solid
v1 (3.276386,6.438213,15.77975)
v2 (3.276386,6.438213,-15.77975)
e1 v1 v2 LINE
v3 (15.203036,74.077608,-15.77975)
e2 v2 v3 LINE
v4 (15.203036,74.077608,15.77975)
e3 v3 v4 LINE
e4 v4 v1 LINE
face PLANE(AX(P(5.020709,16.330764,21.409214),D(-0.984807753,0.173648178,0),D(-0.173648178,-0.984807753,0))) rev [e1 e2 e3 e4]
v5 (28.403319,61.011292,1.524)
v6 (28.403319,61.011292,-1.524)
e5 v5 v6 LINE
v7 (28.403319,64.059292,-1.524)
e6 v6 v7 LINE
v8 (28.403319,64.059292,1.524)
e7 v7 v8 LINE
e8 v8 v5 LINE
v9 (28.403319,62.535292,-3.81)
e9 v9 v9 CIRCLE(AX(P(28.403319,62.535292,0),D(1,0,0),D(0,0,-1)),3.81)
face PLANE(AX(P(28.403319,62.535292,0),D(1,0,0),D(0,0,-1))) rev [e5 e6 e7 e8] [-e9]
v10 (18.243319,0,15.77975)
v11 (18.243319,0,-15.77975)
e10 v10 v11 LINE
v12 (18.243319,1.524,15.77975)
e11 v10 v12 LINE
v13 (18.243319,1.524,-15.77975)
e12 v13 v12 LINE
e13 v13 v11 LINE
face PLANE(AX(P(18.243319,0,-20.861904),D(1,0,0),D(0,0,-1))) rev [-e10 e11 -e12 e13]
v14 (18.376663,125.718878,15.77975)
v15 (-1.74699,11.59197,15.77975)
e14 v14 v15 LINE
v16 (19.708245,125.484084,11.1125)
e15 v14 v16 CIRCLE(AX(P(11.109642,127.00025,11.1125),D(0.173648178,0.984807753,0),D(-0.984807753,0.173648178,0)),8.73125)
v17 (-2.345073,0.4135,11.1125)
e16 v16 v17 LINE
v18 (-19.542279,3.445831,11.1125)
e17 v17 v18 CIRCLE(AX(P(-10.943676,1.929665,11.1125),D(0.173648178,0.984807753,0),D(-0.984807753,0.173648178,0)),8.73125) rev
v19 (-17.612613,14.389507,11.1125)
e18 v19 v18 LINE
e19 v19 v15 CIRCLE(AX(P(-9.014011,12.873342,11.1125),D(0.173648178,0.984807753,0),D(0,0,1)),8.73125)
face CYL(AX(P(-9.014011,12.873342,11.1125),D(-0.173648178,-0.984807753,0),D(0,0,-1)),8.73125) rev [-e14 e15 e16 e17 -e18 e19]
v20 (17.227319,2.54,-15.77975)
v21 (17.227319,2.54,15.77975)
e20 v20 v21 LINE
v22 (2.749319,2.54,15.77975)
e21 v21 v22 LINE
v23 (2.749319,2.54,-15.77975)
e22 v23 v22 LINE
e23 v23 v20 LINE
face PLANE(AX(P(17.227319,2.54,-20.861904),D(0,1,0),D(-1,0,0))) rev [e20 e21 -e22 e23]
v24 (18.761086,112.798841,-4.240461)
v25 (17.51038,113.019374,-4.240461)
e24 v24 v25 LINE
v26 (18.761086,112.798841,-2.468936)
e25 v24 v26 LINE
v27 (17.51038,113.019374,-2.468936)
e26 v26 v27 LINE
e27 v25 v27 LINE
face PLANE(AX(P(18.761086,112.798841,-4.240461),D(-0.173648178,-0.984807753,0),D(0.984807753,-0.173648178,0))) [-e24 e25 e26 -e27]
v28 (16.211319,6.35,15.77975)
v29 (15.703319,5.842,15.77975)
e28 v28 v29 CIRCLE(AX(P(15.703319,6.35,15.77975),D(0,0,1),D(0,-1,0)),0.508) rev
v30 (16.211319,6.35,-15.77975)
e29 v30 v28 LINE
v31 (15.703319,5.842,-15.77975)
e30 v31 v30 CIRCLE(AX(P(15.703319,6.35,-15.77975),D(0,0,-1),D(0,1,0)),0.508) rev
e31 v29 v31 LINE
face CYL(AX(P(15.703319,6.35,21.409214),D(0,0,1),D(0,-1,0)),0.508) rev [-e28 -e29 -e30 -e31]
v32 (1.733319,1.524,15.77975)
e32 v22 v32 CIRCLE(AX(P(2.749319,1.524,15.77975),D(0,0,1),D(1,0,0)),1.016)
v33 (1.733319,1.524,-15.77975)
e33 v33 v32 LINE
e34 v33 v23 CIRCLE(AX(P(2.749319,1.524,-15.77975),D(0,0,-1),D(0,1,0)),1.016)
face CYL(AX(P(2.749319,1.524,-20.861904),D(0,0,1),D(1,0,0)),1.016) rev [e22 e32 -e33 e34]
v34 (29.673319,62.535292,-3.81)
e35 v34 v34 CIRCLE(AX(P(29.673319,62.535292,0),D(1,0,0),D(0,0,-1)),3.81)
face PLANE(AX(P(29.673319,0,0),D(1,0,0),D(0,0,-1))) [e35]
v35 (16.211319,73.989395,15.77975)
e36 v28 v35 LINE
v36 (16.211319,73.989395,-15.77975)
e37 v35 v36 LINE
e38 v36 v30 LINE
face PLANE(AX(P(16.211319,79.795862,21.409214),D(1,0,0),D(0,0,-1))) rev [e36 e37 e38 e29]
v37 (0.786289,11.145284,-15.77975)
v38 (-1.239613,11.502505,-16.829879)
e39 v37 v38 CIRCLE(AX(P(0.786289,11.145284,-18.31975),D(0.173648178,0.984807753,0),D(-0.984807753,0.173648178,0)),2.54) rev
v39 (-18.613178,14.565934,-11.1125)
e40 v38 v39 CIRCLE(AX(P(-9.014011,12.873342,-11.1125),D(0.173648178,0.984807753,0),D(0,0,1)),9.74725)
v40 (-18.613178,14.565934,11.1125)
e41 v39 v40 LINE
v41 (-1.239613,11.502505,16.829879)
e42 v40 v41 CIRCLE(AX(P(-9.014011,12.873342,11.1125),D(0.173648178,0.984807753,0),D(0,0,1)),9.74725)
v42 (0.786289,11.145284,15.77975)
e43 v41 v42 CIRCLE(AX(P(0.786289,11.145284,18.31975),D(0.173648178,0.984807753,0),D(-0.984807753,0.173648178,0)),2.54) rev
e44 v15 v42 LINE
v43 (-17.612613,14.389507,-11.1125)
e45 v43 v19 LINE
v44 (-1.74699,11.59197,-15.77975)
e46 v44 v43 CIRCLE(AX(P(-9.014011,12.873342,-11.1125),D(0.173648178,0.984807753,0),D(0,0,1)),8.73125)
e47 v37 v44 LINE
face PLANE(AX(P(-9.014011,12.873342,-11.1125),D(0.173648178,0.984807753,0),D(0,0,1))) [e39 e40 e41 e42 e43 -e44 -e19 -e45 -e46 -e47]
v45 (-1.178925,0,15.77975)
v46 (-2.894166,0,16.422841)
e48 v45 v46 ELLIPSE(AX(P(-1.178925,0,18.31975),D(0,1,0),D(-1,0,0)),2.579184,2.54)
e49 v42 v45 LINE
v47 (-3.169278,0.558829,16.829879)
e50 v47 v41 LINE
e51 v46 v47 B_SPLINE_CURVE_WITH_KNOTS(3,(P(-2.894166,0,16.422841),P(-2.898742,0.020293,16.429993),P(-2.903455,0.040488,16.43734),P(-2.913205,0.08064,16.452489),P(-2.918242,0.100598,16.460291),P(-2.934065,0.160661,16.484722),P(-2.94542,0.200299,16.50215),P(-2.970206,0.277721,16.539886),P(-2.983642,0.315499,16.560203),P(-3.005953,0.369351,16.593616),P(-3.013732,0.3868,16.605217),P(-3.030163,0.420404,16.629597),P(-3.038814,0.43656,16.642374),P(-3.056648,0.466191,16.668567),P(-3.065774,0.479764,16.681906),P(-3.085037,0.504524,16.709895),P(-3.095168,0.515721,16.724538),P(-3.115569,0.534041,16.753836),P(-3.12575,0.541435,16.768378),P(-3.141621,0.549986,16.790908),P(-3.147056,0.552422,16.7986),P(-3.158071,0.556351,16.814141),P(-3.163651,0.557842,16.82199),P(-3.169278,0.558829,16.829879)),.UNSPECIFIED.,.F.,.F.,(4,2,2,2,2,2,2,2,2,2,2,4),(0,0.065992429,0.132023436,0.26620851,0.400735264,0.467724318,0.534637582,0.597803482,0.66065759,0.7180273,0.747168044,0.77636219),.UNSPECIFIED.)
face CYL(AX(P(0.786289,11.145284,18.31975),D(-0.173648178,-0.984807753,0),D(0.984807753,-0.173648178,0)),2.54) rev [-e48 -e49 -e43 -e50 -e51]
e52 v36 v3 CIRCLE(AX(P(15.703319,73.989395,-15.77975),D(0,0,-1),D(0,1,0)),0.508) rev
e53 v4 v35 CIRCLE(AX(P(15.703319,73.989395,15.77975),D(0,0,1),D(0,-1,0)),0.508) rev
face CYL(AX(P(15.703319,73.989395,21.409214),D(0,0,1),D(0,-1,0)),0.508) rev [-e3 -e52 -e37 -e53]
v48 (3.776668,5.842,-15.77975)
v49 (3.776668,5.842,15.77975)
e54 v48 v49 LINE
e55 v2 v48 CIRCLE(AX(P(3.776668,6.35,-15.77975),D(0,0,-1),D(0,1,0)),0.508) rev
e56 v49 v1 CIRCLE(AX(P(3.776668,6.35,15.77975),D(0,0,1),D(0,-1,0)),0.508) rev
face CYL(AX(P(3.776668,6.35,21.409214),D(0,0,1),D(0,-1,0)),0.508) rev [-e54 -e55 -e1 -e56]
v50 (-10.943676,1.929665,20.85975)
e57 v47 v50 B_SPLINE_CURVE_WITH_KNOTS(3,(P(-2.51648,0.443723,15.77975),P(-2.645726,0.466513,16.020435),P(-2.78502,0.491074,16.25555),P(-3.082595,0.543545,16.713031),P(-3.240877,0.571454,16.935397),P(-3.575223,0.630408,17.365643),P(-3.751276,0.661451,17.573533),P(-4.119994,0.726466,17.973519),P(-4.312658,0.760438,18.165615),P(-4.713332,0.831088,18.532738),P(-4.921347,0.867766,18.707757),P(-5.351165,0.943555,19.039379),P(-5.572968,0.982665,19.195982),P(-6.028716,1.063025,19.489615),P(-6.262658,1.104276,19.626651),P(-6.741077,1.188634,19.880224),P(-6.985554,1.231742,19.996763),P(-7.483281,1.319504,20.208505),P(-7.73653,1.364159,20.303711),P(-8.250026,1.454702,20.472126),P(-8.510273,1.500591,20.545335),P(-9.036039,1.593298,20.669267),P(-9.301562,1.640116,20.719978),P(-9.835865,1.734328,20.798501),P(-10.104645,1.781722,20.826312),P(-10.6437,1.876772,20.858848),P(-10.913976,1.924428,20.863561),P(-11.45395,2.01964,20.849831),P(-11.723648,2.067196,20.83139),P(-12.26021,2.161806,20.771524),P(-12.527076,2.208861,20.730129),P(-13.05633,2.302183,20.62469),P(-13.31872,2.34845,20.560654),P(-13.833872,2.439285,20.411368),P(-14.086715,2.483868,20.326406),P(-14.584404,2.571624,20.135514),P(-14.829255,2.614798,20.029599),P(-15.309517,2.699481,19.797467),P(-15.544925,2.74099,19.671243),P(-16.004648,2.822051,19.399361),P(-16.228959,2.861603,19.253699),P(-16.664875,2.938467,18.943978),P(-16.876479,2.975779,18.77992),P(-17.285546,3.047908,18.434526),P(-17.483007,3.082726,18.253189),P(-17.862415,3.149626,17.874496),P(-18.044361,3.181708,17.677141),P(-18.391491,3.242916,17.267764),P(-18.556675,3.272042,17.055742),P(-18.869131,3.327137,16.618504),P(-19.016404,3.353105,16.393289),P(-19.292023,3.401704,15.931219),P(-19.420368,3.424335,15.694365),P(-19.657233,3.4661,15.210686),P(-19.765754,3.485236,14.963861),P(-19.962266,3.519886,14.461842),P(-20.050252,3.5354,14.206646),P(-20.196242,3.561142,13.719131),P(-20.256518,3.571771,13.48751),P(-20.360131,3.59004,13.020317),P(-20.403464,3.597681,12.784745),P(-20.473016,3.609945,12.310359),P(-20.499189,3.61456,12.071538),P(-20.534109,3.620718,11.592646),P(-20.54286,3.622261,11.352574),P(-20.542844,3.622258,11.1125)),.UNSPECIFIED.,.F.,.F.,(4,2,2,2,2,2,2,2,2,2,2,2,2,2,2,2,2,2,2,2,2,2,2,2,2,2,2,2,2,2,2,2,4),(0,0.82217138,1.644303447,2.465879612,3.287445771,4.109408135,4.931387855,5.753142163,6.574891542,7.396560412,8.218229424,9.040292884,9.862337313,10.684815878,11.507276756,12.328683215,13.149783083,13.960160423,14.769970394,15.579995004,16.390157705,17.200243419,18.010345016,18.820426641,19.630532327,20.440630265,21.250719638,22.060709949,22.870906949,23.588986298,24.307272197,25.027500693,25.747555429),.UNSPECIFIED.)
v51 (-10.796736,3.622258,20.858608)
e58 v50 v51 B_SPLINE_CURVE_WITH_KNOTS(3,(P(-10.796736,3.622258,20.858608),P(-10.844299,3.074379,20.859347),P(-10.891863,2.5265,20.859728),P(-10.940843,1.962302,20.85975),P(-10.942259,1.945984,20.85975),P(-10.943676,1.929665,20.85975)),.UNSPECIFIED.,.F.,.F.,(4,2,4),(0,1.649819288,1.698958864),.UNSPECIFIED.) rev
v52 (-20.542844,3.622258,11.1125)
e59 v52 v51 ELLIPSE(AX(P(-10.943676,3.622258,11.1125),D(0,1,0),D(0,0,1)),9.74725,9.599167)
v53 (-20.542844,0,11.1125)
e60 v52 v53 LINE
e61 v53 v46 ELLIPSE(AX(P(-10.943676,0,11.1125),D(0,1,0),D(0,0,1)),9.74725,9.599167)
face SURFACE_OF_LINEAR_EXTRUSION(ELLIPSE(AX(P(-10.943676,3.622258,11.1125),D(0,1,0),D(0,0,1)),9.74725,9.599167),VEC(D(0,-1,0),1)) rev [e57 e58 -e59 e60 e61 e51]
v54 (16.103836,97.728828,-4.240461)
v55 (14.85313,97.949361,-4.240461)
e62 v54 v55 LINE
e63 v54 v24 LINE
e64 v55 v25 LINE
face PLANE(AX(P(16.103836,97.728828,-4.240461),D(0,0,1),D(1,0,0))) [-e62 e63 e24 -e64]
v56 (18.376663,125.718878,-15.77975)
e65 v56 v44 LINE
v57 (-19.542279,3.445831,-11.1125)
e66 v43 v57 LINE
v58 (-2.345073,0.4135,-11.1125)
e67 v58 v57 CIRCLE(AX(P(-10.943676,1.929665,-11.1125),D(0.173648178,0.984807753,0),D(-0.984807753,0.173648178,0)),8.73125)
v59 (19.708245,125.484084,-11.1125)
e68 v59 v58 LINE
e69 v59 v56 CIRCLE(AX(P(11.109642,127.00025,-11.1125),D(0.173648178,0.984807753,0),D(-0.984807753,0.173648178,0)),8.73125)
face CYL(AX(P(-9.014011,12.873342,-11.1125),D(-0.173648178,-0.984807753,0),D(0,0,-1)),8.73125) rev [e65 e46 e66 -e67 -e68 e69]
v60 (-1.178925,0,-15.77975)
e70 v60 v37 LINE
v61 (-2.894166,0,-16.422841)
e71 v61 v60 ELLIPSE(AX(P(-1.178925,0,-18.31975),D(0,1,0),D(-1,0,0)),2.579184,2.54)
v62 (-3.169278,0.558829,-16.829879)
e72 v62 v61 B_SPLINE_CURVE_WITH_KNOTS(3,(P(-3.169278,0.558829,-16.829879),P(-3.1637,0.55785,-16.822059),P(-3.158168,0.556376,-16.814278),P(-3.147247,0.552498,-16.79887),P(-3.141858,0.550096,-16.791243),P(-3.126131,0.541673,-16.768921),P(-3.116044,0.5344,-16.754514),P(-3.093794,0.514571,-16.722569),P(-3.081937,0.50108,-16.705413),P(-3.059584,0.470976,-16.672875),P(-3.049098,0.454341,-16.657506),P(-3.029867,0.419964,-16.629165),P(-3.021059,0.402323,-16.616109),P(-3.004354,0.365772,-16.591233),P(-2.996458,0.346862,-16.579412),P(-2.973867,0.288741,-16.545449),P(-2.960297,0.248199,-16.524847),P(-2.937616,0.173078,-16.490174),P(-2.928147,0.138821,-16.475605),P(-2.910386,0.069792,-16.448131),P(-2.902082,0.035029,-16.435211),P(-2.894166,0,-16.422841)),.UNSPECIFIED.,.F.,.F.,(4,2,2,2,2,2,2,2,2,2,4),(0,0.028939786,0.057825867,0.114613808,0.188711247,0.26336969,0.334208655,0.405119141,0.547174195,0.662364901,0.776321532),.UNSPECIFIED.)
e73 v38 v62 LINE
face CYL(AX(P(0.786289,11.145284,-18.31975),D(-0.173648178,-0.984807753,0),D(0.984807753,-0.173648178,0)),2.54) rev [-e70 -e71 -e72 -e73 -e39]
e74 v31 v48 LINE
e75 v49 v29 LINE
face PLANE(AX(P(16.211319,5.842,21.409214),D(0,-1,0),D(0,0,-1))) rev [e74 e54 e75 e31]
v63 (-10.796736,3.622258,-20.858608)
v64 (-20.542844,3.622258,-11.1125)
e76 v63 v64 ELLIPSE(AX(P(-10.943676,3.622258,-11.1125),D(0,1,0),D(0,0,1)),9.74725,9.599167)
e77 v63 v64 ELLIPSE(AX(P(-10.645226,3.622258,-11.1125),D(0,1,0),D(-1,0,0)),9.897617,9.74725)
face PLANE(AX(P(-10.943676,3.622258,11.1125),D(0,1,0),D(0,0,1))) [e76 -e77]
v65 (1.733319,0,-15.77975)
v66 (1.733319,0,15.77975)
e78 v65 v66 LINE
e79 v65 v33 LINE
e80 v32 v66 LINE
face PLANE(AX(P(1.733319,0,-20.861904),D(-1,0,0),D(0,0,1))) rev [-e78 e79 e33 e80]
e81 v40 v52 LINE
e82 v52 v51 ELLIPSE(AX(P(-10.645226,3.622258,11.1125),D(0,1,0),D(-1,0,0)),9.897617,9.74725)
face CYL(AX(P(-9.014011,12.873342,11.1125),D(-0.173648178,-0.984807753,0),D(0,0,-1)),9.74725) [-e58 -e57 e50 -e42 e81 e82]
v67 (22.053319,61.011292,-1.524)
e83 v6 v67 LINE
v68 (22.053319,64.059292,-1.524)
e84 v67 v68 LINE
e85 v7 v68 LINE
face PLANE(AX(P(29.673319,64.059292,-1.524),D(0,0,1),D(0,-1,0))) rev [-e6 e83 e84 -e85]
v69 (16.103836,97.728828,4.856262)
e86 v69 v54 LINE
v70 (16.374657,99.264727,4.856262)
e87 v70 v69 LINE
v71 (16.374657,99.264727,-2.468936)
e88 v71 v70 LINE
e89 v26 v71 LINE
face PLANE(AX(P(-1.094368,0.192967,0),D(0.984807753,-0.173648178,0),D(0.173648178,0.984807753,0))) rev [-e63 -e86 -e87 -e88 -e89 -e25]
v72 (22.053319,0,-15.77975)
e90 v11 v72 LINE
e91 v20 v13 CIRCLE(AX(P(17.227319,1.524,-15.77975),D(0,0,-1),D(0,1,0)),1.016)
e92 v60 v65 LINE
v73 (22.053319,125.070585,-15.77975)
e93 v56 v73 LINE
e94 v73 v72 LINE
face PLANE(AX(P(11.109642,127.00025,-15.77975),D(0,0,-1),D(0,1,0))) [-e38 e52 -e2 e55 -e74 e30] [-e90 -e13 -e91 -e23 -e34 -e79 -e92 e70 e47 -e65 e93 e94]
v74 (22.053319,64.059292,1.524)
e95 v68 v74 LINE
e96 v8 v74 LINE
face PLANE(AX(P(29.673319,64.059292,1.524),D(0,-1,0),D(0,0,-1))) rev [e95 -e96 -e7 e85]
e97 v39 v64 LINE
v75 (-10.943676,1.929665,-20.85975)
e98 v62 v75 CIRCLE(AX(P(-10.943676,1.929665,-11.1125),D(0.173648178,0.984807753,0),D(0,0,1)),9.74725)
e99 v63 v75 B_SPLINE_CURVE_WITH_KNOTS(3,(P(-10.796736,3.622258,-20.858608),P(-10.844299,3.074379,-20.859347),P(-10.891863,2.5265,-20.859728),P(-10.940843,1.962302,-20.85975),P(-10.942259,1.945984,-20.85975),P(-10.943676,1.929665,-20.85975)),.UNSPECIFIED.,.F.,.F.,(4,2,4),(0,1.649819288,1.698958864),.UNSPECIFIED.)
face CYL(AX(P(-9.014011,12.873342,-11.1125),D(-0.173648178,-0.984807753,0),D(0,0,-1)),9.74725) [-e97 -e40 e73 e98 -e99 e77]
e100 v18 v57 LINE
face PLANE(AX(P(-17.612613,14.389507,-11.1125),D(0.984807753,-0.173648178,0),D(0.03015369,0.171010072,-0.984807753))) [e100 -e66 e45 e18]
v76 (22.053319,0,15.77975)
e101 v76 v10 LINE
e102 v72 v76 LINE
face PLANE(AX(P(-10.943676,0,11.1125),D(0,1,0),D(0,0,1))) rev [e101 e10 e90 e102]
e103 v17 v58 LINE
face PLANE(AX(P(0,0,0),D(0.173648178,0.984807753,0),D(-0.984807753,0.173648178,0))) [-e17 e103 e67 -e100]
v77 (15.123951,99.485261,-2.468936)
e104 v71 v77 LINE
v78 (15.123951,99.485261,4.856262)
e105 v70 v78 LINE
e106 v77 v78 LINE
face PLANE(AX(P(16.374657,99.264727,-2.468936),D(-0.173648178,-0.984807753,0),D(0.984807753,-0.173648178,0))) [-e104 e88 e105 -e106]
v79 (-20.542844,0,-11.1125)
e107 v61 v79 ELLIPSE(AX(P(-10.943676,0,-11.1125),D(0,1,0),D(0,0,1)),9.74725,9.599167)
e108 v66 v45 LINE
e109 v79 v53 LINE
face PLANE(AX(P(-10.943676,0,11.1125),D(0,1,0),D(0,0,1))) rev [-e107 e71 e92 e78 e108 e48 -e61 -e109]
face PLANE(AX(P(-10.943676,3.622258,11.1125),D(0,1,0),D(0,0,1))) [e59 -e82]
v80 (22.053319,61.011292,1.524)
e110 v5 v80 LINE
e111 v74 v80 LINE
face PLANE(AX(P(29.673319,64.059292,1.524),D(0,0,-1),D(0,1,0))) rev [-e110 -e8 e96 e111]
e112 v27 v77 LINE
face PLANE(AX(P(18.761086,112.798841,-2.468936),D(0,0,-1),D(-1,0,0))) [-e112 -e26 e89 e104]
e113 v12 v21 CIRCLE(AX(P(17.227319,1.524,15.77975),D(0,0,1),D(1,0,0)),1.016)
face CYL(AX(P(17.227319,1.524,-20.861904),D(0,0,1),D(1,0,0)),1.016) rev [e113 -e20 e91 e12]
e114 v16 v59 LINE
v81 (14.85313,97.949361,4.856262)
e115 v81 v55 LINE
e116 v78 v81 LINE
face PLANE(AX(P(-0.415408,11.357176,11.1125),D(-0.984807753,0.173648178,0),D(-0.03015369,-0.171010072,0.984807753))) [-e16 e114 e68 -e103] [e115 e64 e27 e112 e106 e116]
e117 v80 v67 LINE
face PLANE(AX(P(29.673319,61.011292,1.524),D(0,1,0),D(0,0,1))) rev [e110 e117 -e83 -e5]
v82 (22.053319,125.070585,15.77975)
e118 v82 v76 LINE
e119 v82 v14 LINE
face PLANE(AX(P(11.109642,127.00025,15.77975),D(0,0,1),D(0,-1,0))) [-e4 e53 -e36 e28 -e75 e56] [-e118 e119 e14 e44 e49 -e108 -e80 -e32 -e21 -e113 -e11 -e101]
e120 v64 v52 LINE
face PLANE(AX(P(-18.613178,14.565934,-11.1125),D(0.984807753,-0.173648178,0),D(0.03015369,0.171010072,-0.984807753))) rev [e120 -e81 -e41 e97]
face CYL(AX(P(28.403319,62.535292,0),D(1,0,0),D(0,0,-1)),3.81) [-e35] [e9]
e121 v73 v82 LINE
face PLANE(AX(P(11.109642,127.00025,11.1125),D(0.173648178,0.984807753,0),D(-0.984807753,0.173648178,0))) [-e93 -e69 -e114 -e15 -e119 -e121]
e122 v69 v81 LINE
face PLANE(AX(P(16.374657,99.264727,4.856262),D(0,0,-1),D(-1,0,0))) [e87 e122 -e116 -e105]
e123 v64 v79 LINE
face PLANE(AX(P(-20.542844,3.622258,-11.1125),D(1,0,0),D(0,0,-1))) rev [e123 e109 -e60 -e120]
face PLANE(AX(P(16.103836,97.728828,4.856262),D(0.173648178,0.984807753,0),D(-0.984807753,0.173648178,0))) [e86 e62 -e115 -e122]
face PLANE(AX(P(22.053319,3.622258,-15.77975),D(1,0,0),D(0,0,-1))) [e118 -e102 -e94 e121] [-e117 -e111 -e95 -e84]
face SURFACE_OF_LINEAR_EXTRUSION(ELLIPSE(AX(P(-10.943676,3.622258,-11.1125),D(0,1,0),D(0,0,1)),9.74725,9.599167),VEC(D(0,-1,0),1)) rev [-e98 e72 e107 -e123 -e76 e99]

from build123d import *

# Parameters (mm, degrees)
BOSS_EXTRUDE1_DEPTH   = 3.175
BOSS_EXTRUDE2_START   = -3.175
BOSS_EXTRUDE2_DEPTH   = 11.112499999999999
BODY_MOVE_COPY2_ANGLE = 90.0000000000002
BOSS_EXTRUDE5_START   = -3.175
BOSS_EXTRUDE5_DEPTH   = 127
BOSS_EXTRUDE7_DEPTH   = 3.622257574
CUT_EXTRUDE1_START    = -11.112499999999999
CUT_EXTRUDE1_DEPTH    = 11.112499999999999
CUT_EXTRUDE4_REACH    = 131.332
LOFT1_START           = -15.77975
LOFT1_DEPTH           = 31.5595
CUT_EXTRUDE5_DEPTH    = 1.27
CUT_EXTRUDE6_DEPTH    = 133.79321580314624
FILLET2_R             = 0.508
CUT_EXTRUDE7_DEPTH    = 133.79321580314624
FILLET3_R             = 2.54
BOSS_EXTRUDE9_DEPTH   = 7.619999999999999
SKETCH20_R            = 3.81
BOSS_EXTRUDE10_DEPTH  = 1.27


with BuildPart() as part:
    # Sketch4 → Boss-Extrude1 (new body)
    with BuildSketch(Plane(origin=(0, 0, 0), x_dir=(0.984807753012208, -0.17364817766693072, 0), z_dir=(0.17364817766693072, 0.984807753012208, 0))):
        with BuildLine():
            Line((0, -8.731249999999998), (-22.225, -8.731249999999998))
            ThreePointArc((-22.225, -8.731249999999998), (-30.956249999999997, -1.63e-15), (-22.225000000000005, 8.73124999999999))
            Line((-22.225000000000005, 8.73124999999999), (1.71e-15, 8.73125))
            ThreePointArc((1.71e-15, 8.73125), (8.731249999999998, 0), (0, -8.731249999999998))
        make_face()
    extrude(amount=BOSS_EXTRUDE1_DEPTH)

    # Sketch5 → Boss-Extrude2 (add)
    with BuildSketch(Plane(origin=(0.5513329640925053, 3.1267646158137623, 0), x_dir=(0.9848077530122081, -0.17364817766693072, 0), z_dir=(0.17364817766693072, 0.9848077530122081, 0)).offset(BOSS_EXTRUDE2_START)):
        with BuildLine():
            Line((1.57e-15, 9.74725), (-22.225000000000005, 9.74724999999999))
            ThreePointArc((-22.225000000000005, 9.74724999999999), (-31.97225, -1.51e-15), (-22.225, -9.747249999999998))
            Line((-22.225, -9.747249999999998), (1.79e-15, -9.74725))
            ThreePointArc((1.79e-15, -9.74725), (9.74725, 2.16e-15), (1.57e-15, 9.74725))
        make_face()
        with BuildLine():
            Line((5.3e-16, 8.73125), (-22.225000000000005, 8.73124999999999))
            ThreePointArc((-22.225000000000005, 8.73124999999999), (-30.956249999999997, -1.63e-15), (-22.225000000000005, -8.731249999999998))
            Line((-22.225000000000005, -8.731249999999998), (-1.6e-15, -8.73125))
            ThreePointArc((-1.6e-15, -8.73125), (8.73125, -1.94e-15), (5.3e-16, 8.73125))
        make_face(mode=Mode.SUBTRACT)
    extrude(amount=BOSS_EXTRUDE2_DEPTH)


with BuildPart() as part_1:
    # Body-Move/Copy2: moved
    add(part.part.moved(Location((5e-17, 2.8e-16, 0))).rotate(Axis((-10.943676155348163, 1.9296653743237675, 1.73e-15), (0.1736481776669307, 0.984807753012208, 0)), BODY_MOVE_COPY2_ANGLE))

    # Sketch6 → Boss-Extrude5 (add)
    with BuildSketch(Plane(origin=(0.5513329640925054, 3.1267646158137636, -9e-17), x_dir=(0.9848077530122081, -0.1736481776669307, 0), z_dir=(0.1736481776669307, 0.9848077530122081, 0)).offset(BOSS_EXTRUDE5_START)):
        with BuildLine():
            Line((4.4e-16, 15.779750000000002), (-2.5553006918151486, 15.779750000000002))
            ThreePointArc((-2.5553006918151517, 15.77975), (-1.6674472336253352, 13.520790016359634), (-1.3652500000000423, 11.112500000000036))
            Line((-1.3652500000000418, 11.112500000000034), (-1.3652499999999672, -11.11250000000001))
            ThreePointArc((-1.3652499999999694, -11.112500000000013), (-1.667447233625257, -13.520790016359623), (-2.5553006918150736, -15.77975))
            Line((-2.555300691815072, -15.779750000000002), (4.49e-15, -15.779750000000002))
            Line((-1.1e-16, -15.77975), (-1.1e-16, 15.779750000000002))
        make_face()
        with BuildLine():
            ThreePointArc((-1.3652500000000423, 11.112500000000036), (-1.6674472336253352, 13.520790016359634), (-2.5553006918151517, 15.77975))
            Line((-2.5553006918151486, 15.779750000000002), (-3.733373764462396, 15.779750000000002))
            ThreePointArc((-3.7333737644623968, 15.77975), (-2.7260906817477455, 13.54208130327656), (-2.381250000000044, 11.11250000000003))
            Line((-2.3812500000000436, 11.112500000000027), (-2.381249999999966, -11.112499999999974))
            ThreePointArc((-2.3812499999999677, -11.112499999999974), (-2.7260906817476602, -13.542081303276534), (-3.7333737644623177, -15.779750000000003))
            Line((-3.7333737644623204, -15.779750000000002), (-2.555300691815072, -15.779750000000002))
            ThreePointArc((-2.5553006918150736, -15.77975), (-1.667447233625257, -13.520790016359623), (-1.3652499999999694, -11.112500000000013))
            Line((-1.3652499999999672, -11.11250000000001), (-1.3652500000000418, 11.112500000000034))
        make_face()
    extrude(amount=BOSS_EXTRUDE5_DEPTH)


with BuildPart() as boss_extrude7_tool:
    # Boss-Extrude7: read off the stored shape, not the designer's step
    # Boss-Extrude7 outline → Boss-Extrude7 (new body)
    with BuildSketch(Plane(origin=(0, 0, 0), x_dir=(1, 0, 0), z_dir=(0, 1, 0))):
        with BuildLine():
            Line((22.053318564, 15.77975), (-2.516479933, 15.77975))
            add(Edge.make_bspline(
                [(-2.516479933, 15.77975), (-6.087914144025663, 22.428833371813603), (-13.315378834961066, 20.557552766374705), (-20.54284352589647, 18.686272160935808), (-20.542843526, 11.1125)],
                knots=[2.070114834496927, 2.070114834496927, 2.070114834496927, 3.3912519074408096, 3.3912519074408096, 4.712388980384692, 4.712388980384692, 4.712388980384692], degree=2, weights=[1, 0.7896435245481747, 1, 0.7896435245481747, 1]))
            Line((-20.542843526, 11.1125), (-20.542843526, -11.1125))
            add(Edge.make_bspline(
                [(-20.542843526, -11.1125), (-20.542843525896345, -18.68627216093585), (-13.315378834960956, -20.557552766374716), (-6.08791414402557, -22.428833371813585), (-2.516479933, -15.77975)],
                knots=[4.712388980384692, 4.712388980384692, 4.712388980384692, 6.033526053328573, 6.033526053328573, 7.354663126272453, 7.354663126272453, 7.354663126272453], degree=2, weights=[1, 0.7896435245481753, 1, 0.7896435245481753, 1]))
            Line((-2.516479933, -15.77975), (22.053318564, -15.77975))
            Line((22.053318564, -15.77975), (22.053318564, 15.77975))
        make_face()
    extrude(amount=BOSS_EXTRUDE7_DEPTH)


with BuildPart() as part_2:
    add(part_1.part)


with BuildPart() as part_3:
    # Boss-Extrude7: joined with boss_extrude7_tool
    add(part_2.part.fuse(boss_extrude7_tool.part, tol=0.00001))

    # Sketch8 → Cut-Extrude1 (cut)
    with BuildSketch(Plane(origin=(1.929665374323769, 10.943676155348173, 0), x_dir=(0.9848077530122081, -0.17364817766693075, 0), z_dir=(0.17364817766693075, 0.9848077530122081, 0)).offset(CUT_EXTRUDE1_START)):
        with BuildLine():
            ThreePointArc((-3.7333737644623213, -15.779750000000003), (-3.2397646593705955, -14.88804828056871), (-2.853430222713813, -13.944900567790237))
            Line((-2.8534302227138113, -13.944900567790235), (-2.853430222713809, 13.94490056779))
            ThreePointArc((-2.8534302227138095, 13.94490056779), (-3.2397646593706177, 14.888048280568597), (-3.7333737644623985, 15.779750000000003))
            ThreePointArc((-3.7333737644623985, 15.779750000000003), (-13.542081303276605, 19.498909318252295), (-19.843750000000043, 11.112499999999972))
            Line((-19.843750000000046, 11.112499999999972), (-19.843749999999957, -11.112500000000043))
            ThreePointArc((-19.843749999999957, -11.112500000000042), (-13.54208130327649, -19.498909318252302), (-3.7333737644623213, -15.779750000000003))
        make_face()
    extrude(amount=CUT_EXTRUDE1_DEPTH, mode=Mode.SUBTRACT)

    # Sketch9 → Cut-Extrude4 (cut, up to next)
    with BuildSketch(Plane(origin=(0, 0, 0), x_dir=(0.9848077530122081, -0.17364817766693072, 0), z_dir=(0.17364817766693072, 0.9848077530122081, 0)), mode=Mode.PRIVATE) as cut_extrude4_sk1:
        with BuildLine():
            Line((-2.3812500000174737, -11.112499999999976), (-2.3812500000295542, 11.112500000000031))
            ThreePointArc((-2.3812500000295542, 11.112500000000031), (-2.500104004853256, 12.54824433126907), (-2.853430222713811, 13.944900567789999))
            Line((-2.853430222713811, 13.944900567789999), (-2.8534302227138113, -13.944900567790238))
            ThreePointArc((-2.8534302227138113, -13.944900567790238), (-2.500104004825662, -12.548244331273757), (-2.3812500000174737, -11.112499999999976))
        make_face()
    cut_extrude4_tool1 = extrude(cut_extrude4_sk1.sketch, amount=CUT_EXTRUDE4_REACH, mode=Mode.PRIVATE) & part_3.part
    add(cut_extrude4_tool1.solids().sort_by_distance((-2.584299, 0.455682, 0))[0], mode=Mode.SUBTRACT)

    # Loft1: read off the stored shape, not the designer's step
    # Loft1 outline → Loft1 (add)
    with BuildSketch(Plane.XY.offset(LOFT1_START)):
        Polygon((0.638701741, 3.622257574), (22.053318564, 3.622257574), (22.053318564, 125.070584633), align=None)
    extrude(amount=LOFT1_DEPTH)

    # Sketch12 → Cut-Extrude5 (cut)
    with BuildSketch(Plane(origin=(-2.345073461860326, 0.4134997230693797, 8.13e-15), x_dir=(3.36e-15, -5.9e-16, 1), z_dir=(-0.9848077530122081, 0.17364817766693072, 3.4134285390241548e-15))):
        Polygon((-4.240460714922467, 114.34300132888832), (-2.4689363790337167, 114.34300132888832), (-2.4689363790337167, 100.60010241642621), (4.856262408628966, 100.60010241642621), (4.856262408628966, 99.04050890599655), (-4.240460714922467, 99.04050890599655), align=None)
    extrude(amount=-CUT_EXTRUDE5_DEPTH, mode=Mode.SUBTRACT)

    # Sketch13 → Cut-Extrude6 (cut, through all)
    with BuildSketch(Plane(origin=(-8e-17, -4.3e-16, -15.779750000000002), x_dir=(-1, 0, 0), z_dir=(0, -3e-17, -1))):
        Polygon((-5.020709493215531, 16.330763945263843), (-3.171257415384888, 5.842), (-4.367504164096216, 5.842), (-16.211318563640102, 5.842), (-16.211318563640102, 79.79586171686451), align=None)
    extrude(amount=-CUT_EXTRUDE6_DEPTH, mode=Mode.SUBTRACT)

    # Fillet2
    fillet2_edges = [part_3.edges().sort_by_distance(p)[0] for p in [
        (3.171257415384888, 5.842, -1.78e-15),
        (16.211318563640102, 5.842, -1.78e-15),
        (16.211318563640102, 79.79586171686451, -1.78e-15),
    ]]
    fillet(fillet2_edges, radius=FILLET2_R)

    # Sketch15 → Cut-Extrude7 (cut, through all)
    with BuildSketch(Plane.XY.offset(15.779750000000002)):
        with BuildLine():
            Line((18.243318563640102, -4.3e-16), (1.733318563640101, -2.45e-15))
            Line((1.733318563640101, -2.45e-15), (1.733318563640101, 1.5239999999999905))
            ThreePointArc((1.733318563640101, 1.5239999999999905), (2.0308980739545683, 2.24242048968553), (2.7493185636401076, 2.5399999999999974))
            Line((2.7493185636401076, 2.5399999999999974), (17.227318563640093, 2.5399999999999996))
            ThreePointArc((17.227318563640093, 2.5399999999999996), (17.945739053325635, 2.242420489685533), (18.243318563640102, 1.5239999999999927))
            Line((18.243318563640102, 1.5239999999999927), (18.243318563640102, -4.3e-16))
        make_face()
    extrude(amount=-CUT_EXTRUDE7_DEPTH, mode=Mode.SUBTRACT)

    # Fillet3
    fillet3_edges = [part_3.edges().sort_by_distance(p)[0] for p in [
        (-1.5516472454151984, 5.915561386198842, -15.779750000000057),
        (-1.5516472454151131, 5.915561386198828, 15.779750000000059),
    ]]
    fillet(fillet3_edges, radius=FILLET3_R)

    # Sketch18 → Boss-Extrude9 (add)
    with BuildSketch(Plane(origin=(22.0533185636401, 0, 0), x_dir=(0, 0, -1), z_dir=(1, 0, 0))):
        Polygon((-1.5240000000000167, 64.05929231628052), (1.5239999999999834, 64.05929231628052), (1.5239999999999836, 61.01129231628052), (-1.5240000000000162, 61.01129231628052), align=None)
    extrude(amount=BOSS_EXTRUDE9_DEPTH)

    # Sketch20 → Boss-Extrude10 (add)
    with BuildSketch(Plane(origin=(29.673318563640102, 0, 0), x_dir=(0, 0, -1), z_dir=(1, 0, 0))):
        with Locations((2.2e-16, 62.53529231628052)):
            Circle(SKETCH20_R)
        Polygon((1.5239999999999836, 61.01129231628052), (1.5239999999999834, 64.05929231628052), (-1.5240000000000167, 64.05929231628052), (-1.5240000000000162, 61.01129231628052), align=None, mode=Mode.SUBTRACT)
    extrude(amount=-BOSS_EXTRUDE10_DEPTH)


solid = part_3.part
